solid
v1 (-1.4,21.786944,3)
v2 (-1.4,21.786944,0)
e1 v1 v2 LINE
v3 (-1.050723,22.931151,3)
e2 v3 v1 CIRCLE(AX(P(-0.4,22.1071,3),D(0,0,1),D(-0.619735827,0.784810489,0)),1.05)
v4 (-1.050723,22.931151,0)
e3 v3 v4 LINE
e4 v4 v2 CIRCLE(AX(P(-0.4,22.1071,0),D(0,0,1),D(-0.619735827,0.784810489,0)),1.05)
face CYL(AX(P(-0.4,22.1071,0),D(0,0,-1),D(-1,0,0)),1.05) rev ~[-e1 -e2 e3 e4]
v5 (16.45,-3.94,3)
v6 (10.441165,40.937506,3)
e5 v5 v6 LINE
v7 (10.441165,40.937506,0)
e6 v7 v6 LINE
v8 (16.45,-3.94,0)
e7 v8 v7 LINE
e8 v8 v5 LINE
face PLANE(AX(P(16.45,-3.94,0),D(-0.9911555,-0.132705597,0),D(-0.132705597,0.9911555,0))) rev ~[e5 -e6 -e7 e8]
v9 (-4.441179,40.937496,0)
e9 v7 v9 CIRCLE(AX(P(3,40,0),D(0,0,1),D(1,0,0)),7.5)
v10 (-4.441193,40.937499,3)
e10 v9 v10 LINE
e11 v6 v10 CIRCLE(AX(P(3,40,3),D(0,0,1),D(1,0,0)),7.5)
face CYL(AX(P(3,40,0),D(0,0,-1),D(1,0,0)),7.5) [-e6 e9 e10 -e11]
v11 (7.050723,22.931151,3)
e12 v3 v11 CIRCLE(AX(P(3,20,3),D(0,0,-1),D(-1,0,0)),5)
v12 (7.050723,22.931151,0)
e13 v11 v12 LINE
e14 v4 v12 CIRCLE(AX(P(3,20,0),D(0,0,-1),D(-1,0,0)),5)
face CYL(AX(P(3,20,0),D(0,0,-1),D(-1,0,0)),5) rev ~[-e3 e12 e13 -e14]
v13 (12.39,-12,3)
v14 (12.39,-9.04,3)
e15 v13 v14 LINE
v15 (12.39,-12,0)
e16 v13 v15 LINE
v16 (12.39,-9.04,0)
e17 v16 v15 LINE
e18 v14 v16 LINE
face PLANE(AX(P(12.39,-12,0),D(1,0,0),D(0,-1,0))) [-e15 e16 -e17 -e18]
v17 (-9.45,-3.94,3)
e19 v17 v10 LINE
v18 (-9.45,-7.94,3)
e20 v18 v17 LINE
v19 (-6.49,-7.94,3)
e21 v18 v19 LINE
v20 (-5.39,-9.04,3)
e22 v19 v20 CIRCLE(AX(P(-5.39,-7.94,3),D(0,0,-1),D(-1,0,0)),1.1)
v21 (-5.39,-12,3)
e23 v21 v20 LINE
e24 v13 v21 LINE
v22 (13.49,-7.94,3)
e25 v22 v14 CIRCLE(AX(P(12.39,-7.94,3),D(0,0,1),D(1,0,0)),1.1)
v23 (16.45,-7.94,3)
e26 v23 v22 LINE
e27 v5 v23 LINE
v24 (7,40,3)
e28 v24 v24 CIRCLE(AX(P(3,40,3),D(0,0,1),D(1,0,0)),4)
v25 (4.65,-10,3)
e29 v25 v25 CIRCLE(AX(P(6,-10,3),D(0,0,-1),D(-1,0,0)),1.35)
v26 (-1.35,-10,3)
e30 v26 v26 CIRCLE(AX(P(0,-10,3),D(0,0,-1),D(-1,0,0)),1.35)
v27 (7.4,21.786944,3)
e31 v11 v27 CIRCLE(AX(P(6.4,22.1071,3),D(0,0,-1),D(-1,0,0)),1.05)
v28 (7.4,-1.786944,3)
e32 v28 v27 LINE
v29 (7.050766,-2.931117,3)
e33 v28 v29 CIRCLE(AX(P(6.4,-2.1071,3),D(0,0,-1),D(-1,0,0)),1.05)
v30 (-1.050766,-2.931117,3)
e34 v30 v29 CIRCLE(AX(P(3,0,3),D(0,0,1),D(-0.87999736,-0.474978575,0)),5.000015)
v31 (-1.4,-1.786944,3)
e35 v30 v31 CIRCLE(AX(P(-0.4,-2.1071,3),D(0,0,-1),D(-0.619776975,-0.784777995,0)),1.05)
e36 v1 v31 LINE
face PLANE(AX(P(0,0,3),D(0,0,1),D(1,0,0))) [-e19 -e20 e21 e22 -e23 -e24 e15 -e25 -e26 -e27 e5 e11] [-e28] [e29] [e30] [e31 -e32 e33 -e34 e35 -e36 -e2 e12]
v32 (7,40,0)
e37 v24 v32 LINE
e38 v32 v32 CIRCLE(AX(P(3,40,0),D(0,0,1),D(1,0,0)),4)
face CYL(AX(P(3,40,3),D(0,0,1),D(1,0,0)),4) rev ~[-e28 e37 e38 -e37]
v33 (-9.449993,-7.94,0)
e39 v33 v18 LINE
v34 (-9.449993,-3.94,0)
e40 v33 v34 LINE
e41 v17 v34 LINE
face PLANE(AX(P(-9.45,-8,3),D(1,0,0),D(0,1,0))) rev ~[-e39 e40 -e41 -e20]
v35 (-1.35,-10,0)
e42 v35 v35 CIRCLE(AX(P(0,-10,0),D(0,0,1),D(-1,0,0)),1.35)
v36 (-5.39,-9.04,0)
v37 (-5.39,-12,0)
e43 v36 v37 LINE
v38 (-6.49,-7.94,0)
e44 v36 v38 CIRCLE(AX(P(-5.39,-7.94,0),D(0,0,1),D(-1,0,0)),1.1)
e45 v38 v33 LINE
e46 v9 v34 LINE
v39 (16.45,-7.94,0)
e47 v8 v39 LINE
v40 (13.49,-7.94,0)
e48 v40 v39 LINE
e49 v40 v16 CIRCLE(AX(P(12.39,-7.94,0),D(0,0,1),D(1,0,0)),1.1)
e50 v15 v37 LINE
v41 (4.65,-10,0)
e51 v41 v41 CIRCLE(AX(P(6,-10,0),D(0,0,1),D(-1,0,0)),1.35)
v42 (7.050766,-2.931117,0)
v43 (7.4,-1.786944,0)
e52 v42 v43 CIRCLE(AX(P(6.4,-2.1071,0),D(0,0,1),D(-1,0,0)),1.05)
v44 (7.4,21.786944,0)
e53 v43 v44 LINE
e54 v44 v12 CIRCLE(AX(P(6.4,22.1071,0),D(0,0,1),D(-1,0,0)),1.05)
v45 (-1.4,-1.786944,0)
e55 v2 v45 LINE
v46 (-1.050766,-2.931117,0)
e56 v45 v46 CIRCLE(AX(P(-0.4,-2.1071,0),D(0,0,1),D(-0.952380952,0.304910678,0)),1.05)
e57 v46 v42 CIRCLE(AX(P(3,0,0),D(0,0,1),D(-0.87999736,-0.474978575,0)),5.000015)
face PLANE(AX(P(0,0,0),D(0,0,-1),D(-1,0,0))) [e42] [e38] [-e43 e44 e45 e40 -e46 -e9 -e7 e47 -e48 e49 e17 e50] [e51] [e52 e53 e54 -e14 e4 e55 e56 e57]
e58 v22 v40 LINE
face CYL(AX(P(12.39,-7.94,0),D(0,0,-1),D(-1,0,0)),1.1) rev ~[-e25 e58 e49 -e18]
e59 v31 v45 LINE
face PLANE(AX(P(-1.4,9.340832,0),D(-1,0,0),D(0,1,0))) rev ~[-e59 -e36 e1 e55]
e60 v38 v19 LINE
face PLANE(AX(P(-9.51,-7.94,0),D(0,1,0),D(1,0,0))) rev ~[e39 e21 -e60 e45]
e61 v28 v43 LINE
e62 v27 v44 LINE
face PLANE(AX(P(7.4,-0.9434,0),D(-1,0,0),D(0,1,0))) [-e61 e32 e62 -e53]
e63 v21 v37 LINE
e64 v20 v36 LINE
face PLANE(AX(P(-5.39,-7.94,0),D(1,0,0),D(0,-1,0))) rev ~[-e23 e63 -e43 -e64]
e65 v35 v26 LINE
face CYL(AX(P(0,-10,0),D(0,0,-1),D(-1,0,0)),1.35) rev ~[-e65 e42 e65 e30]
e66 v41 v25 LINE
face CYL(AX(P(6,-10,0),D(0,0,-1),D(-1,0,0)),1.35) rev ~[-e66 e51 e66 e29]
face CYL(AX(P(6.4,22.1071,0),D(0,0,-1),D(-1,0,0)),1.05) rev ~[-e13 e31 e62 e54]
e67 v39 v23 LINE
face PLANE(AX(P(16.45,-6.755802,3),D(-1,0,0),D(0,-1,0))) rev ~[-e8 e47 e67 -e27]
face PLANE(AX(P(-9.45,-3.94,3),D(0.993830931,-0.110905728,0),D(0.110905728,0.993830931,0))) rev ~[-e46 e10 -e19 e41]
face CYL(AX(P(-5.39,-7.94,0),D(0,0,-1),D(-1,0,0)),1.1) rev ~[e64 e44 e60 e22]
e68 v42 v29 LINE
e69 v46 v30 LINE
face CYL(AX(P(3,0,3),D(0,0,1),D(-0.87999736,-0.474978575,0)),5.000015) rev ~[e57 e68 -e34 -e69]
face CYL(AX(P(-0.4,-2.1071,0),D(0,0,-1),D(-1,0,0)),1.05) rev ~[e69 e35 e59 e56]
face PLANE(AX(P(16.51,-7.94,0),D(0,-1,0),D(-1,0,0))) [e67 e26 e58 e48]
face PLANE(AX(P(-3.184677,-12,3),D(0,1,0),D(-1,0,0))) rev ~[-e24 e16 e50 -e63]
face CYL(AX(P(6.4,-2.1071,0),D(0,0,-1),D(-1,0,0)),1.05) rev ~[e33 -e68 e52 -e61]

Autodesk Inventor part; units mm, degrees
ref_plane "YZ Plane" through (0, 0, 0) normal (1, 0, 0) x (0, 1, 0)
ref_plane "XZ Plane" through (0, 0, 0) normal (0, 1, 0) x (-1, 0, 0)
ref_plane "XY Plane" through (0, 0, 0) normal (0, 0, 1) x (1, 0, 0)
sketch "스케치1" plane through (0, 0, 0) normal (0, 0, 1) x (1, 0, 0)
  circle A0 centre (3, 0) radius 3 projected
  line L0 (7.4, -0.9434) -> (7.4, 0.9434) projected
  arc A1 (7.4, 0.9434) -> (-1.4, 0.9434) centre (3, 0) ccw projected
  line L1 (-1.4, 0.9434) -> (-1.4, -0.9434) projected
  arc A2 (-1.4, -0.9434) -> (7.4, -0.9434) centre (3, 0) ccw projected
  circle A3 centre (3, 20) radius 2.75 projected
  line L2 (3, 20) -> (3, 0)
  line L3 (3, 20) -> (3, 40)
  circle A4 centre (3, 40) radius 2.75
  circle A5 centre (3, 40) radius 7.5
  circle A6 centre (3, 0) radius 12.5
  line L4 (16.7123, -8.8378) -> (8.966, 52.6461)
  line L5 (-2.8681, 53.4235) -> (-11.5752, -15.6873)
  point P0 (0, 0)
  point P1 (10.4412, 40.9375)
  point P2 (-4.4412, 40.9375)
  point P3 (-9.402, 1.5625)
  point P4 (15.402, 1.5625)
  dimension "d2" = 360
  dimension "d4" = 5.5
  dimension "d5" = 15
  dimension "d6" = 25
extrude "돌출1" add sketch "스케치1" along normal blind 3 contours A3 L3 A5 L4 A6 L2 | A3 L2 A6 L5 A5 L3 | A5 | A6
sketch "스케치2" plane through (0, 0, 3) normal (0, 0, 1) x (1, 0, 0)
  line L0 (-4.4412, 40.9375) -> (-9.402, 1.5625) projected
  arc A0 (-9.402, 1.5625) -> (15.402, 1.5625) centre (3, 0) ccw projected
  line L1 (15.402, 1.5625) -> (10.4412, 40.9375) projected
  arc A1 (10.4412, 40.9375) -> (-4.4412, 40.9375) centre (3, 40) ccw projected
  circle A2 centre (3, 40) radius 2.75 projected
  circle A3 centre (3, 20) radius 2.75 projected
  arc A4 (7.4, 0.9434) -> (-1.4, 0.9434) centre (3, 0) ccw projected
  line L2 (7.4, 0.9434) -> (7.4, -0.9434) projected
  arc A5 (-1.4, -0.9434) -> (7.4, -0.9434) centre (3, 0) ccw projected
  line L3 (-1.4, -0.9434) -> (-1.4, 0.9434) projected
  line L4 (-1.4, 14.3273) -> (-1.4, 9.5775) projected
  arc A6 (7.4, 14.3273) -> (-1.4, 14.3273) centre (3, 11.9524) ccw projected
  line L5 (7.4, 9.5775) -> (7.4, 14.3273) projected
  arc A7 (-1.4, 9.5775) -> (7.4, 9.5775) centre (3, 11.9524) ccw projected
  circle A8 centre (3, 11.9524) radius 6 projected
  line L6 (-1.4, 14.3273) -> (-1.4, -0.9434)
  line L7 (7.4, 14.3273) -> (7.4, -0.9434)
  point P0 (0, 0)
  point P1 (-1.4, 0.9434)
  point P2 (7.4, 0.9434)
extrude "돌출2" cut sketch "스케치2" against normal up to surface (3 mm away) contours L6 A7 L7 A8 | A8 L7 A4 L6 | L4 A6 L5 A7
sketch "스케치3" plane through (0, 0, 0) normal (0, 0, -1) x (-1, 0, 0)
  circle A0 centre (-3, 40) radius 3.7 projected
  point P0 (0, 0)
extrude "돌출3" cut sketch "스케치3" against normal through all
sketch "스케치4" plane through (0, 0, 3) normal (0, 0, 1) x (1, 0, 0)
  circle A0 centre (3, 40) radius 4 projected
  circle A1 centre (3, 40) radius 3.7 projected
  line L0 (-1.4, -0.9434) -> (-1.4, 14.3273) projected
  arc A2 (7.4, 14.3273) -> (-1.4, 14.3273) centre (3, 11.9524) ccw projected
  line L1 (7.4, 14.3273) -> (7.4, -0.9434) projected
  arc A3 (-1.4, -0.9434) -> (7.4, -0.9434) centre (3, 0) ccw projected
  circle A4 centre (3, 20) radius 2.75 projected
  line L2 (-4.4412, 40.9375) -> (-9.402, 1.5625) projected
  arc A5 (-9.402, 1.5625) -> (15.402, 1.5625) centre (3, 0) ccw projected
  line L3 (15.402, 1.5625) -> (10.4412, 40.9375) projected
  arc A6 (10.4412, 40.9375) -> (-4.4412, 40.9375) centre (3, 40) ccw projected
  point P0 (0, 0)
extrude "돌출4" cut sketch "스케치4" against normal through all contours A0 | A1
sketch "스케치5" plane through (0, 0, 3) normal (0, 0, 1) x (1, 0, 0)
  circle A0 centre (3, 40) radius 4 projected
  line L0 (-1.4, -0.9434) -> (-1.4, 14.3273) projected
  arc A1 (7.4, 14.3273) -> (-1.4, 14.3273) centre (3, 11.9524) ccw projected
  line L1 (7.4, 14.3273) -> (7.4, -0.9434) projected
  arc A2 (-1.4, -0.9434) -> (7.4, -0.9434) centre (3, 0) ccw projected
  circle A3 centre (3, 20) radius 2.75 projected
  line L2 (-4.4412, 40.9375) -> (-9.402, 1.5625) projected
  arc A4 (-9.402, 1.5625) -> (15.402, 1.5625) centre (3, 0) ccw projected
  line L3 (15.402, 1.5625) -> (10.4412, 40.9375) projected
  arc A5 (10.4412, 40.9375) -> (-4.4412, 40.9375) centre (3, 40) ccw projected
  point P0 (0, 0)
extrude "돌출5" add sketch "스케치5" against normal up to surface (3 mm away) contours A3
sketch "스케치6" plane through (0, 0, 3) normal (0, 0, 1) x (1, 0, 0)
  circle A0 centre (3, 40) radius 4 projected
  line L0 (-1.4, -0.9434) -> (-1.4, 14.3273) projected
  arc A1 (7.4, 14.3273) -> (-1.4, 14.3273) centre (3, 11.9524) ccw projected
  line L1 (7.4, 14.3273) -> (7.4, -0.9434) projected
  arc A2 (-1.4, -0.9434) -> (7.4, -0.9434) centre (3, 0) ccw projected
  line L2 (-4.4412, 40.9375) -> (-9.402, 1.5625) projected
  arc A3 (-9.402, 1.5625) -> (15.402, 1.5625) centre (3, 0) ccw projected
  line L3 (15.402, 1.5625) -> (10.4412, 40.9375) projected
  arc A4 (10.4412, 40.9375) -> (-4.4412, 40.9375) centre (3, 40) ccw projected
  line L4 (-6.4255, 1.1875) -> (-1.4647, 40.5625)
  arc A5 (7.4647, 40.5625) -> (-1.4647, 40.5625) centre (3, 40) ccw
  line L5 (7.4647, 40.5625) -> (12.4255, 1.1875)
  arc A6 (-6.4255, 1.1875) -> (12.4255, 1.1875) centre (3, 0) ccw
  circle A7 centre (3, 40) radius 7
  circle A8 centre (3, 11.9524) radius 8.0059
  point P0 (0, 0)
  point P1 (-4.9432, 12.9531)
  point P2 (10.9432, 12.9531)
  point P3 (8.1349, 35.2427)
  point P4 (-2.1349, 35.2427)
  dimension "d17" = 3
  dimension "d18" = 3
extrude "돌출6" cut sketch "스케치6" against normal through all contours L4 A7 L5 A8
fillet "모깎기1" radius 2 4 edges at (-2.1349, 35.2427, 1.5) (8.1349, 35.2427, 1.5) (-4.9432, 12.9531, 1.5) (10.9432, 12.9531, 1.5)
sketch "스케치8" plane through (0, 0, 3) normal (0, 0, 1) x (1, 0, 0)
  arc A0 (0.2302, 33.5713) -> (5.7698, 33.5713) centre (3, 40) ccw projected
  arc A1 (0.2302, 33.5713) -> (-2.5454, 31.9845) centre (-0.5611, 31.7345) ccw projected
  line L0 (-2.5454, 31.9845) -> (-3.9428, 20.8933) projected
  arc A2 (-3.9428, 20.8933) -> (-0.9674, 18.9062) centre (-1.9585, 20.6433) ccw projected
  arc A3 (6.9674, 18.9062) -> (-0.9674, 18.9062) centre (3, 11.9524) ccw projected
  arc A4 (6.9674, 18.9062) -> (9.9428, 20.8933) centre (7.9585, 20.6433) ccw projected
  line L1 (9.9428, 20.8933) -> (8.5454, 31.9845) projected
  arc A5 (8.5454, 31.9845) -> (5.7698, 33.5713) centre (6.5611, 31.7345) ccw projected
  circle A6 centre (3, 40) radius 4 projected
  line L2 (-1.4, 14.3273) -> (-1.4, -0.9434) projected
  arc A7 (-1.4, -0.9434) -> (7.4, -0.9434) centre (3, 0) ccw projected
  line L3 (7.4, -0.9434) -> (7.4, 14.3273) projected
  arc A8 (7.4, 14.3273) -> (-1.4, 14.3273) centre (3, 11.9524) ccw projected
  line L4 (-4.4412, 40.9375) -> (-9.402, 1.5625) projected
  arc A9 (10.4412, 40.9375) -> (-4.4412, 40.9375) centre (3, 40) ccw projected
  line L5 (15.402, 1.5625) -> (10.4412, 40.9375) projected
  arc A10 (-9.402, 1.5625) -> (15.402, 1.5625) centre (3, 0) ccw projected
  arc A11 (-1.4, 9.3409) -> (7.4, 9.3409) centre (3, 11.7157) ccw projected
  arc A12 (7.4, 14.0906) -> (-1.4, 14.0906) centre (3, 11.7157) ccw projected
  point P0 (0, 0)
extrude "돌출8" add sketch "스케치8" against normal up to surface (3 mm away) contours A8 L3 A12 L2
sketch "스케치9" plane through (0, 0, 0) normal (0, 0, -1) x (-1, 0, 0)
  line L0 (10.45, -12) -> (-15.45, -12)
  line L1 (10.45, -12) -> (10.45, -8)
  line L2 (-15.45, -8) -> (10.45, -8)
  line L3 (-15.45, -12) -> (-15.45, -8)
  arc A0 (-5.7698, 33.5713) -> (-0.2302, 33.5713) centre (-3, 40) ccw projected
  arc A1 (2.5454, 31.9845) -> (-0.2302, 33.5713) centre (0.5611, 31.7345) ccw projected
  line L4 (2.5454, 31.9845) -> (3.9428, 20.8933) projected
  arc A2 (0.9674, 18.9062) -> (3.9428, 20.8933) centre (1.9585, 20.6433) ccw projected
  arc A3 (0.9674, 18.9062) -> (-6.9674, 18.9062) centre (-3, 11.9524) ccw projected
  arc A4 (-9.9428, 20.8933) -> (-6.9674, 18.9062) centre (-7.9585, 20.6433) ccw projected
  line L5 (-9.9428, 20.8933) -> (-8.5454, 31.9845) projected
  arc A5 (-5.7698, 33.5713) -> (-8.5454, 31.9845) centre (-6.5611, 31.7345) ccw projected
  circle A6 centre (-3, 40) radius 4 projected
  line L6 (1.4, 14.0906) -> (1.4, -0.9434) projected
  arc A7 (-7.4, -0.9434) -> (1.4, -0.9434) centre (-3, 0) ccw projected
  line L7 (-7.4, -0.9434) -> (-7.4, 14.0906) projected
  arc A8 (1.4, 14.0906) -> (-7.4, 14.0906) centre (-3, 11.7157) ccw projected
  line L8 (4.4412, 40.9375) -> (9.402, 1.5625) projected
  arc A9 (4.4412, 40.9375) -> (-10.4412, 40.9375) centre (-3, 40) ccw projected
  line L9 (-15.402, 1.5625) -> (-10.4412, 40.9375) projected
  arc A10 (-15.402, 1.5625) -> (9.402, 1.5625) centre (-3, 0) ccw projected
  circle A11 centre (-3, 0) radius 12.5
  line L10 (-3, 0) -> (-15.5, 0)
  line L11 (-15.5, 0) -> (9.5, 0)
  line L12 (9.5, 0) -> (-15.5, 0)
  line L13 (-15.5, 0) -> (-15.5, -12)
  line L14 (-15.5, -12) -> (9.5, -12)
  line L15 (9.5, -12) -> (9.5, 0)
  point P0 (0, 0)
  point P1 (-6.5, -12)
  point P2 (0.5, -12)
extrude "돌출9" add sketch "스케치9" against normal up to surface (3 mm away) contours L0 A10 L2 L15 | L2 A10 L15 | L0 L3 L2 A10 | L14 L13 A10 L2 L3
sketch "스케치10" plane through (0, 0, 0) normal (0, 0, -1) x (-1, 0, 0)
  arc A0 (-5.7698, 33.5713) -> (-0.2302, 33.5713) centre (-3, 40) ccw projected
  arc A1 (2.5454, 31.9845) -> (-0.2302, 33.5713) centre (0.5611, 31.7345) ccw projected
  line L0 (2.5454, 31.9845) -> (3.9428, 20.8933) projected
  arc A2 (0.9674, 18.9062) -> (3.9428, 20.8933) centre (1.9585, 20.6433) ccw projected
  arc A3 (0.9674, 18.9062) -> (-6.9674, 18.9062) centre (-3, 11.9524) ccw projected
  arc A4 (-9.9428, 20.8933) -> (-6.9674, 18.9062) centre (-7.9585, 20.6433) ccw projected
  line L1 (-9.9428, 20.8933) -> (-8.5454, 31.9845) projected
  arc A5 (-5.7698, 33.5713) -> (-8.5454, 31.9845) centre (-6.5611, 31.7345) ccw projected
  circle A6 centre (-3, 40) radius 4 projected
  line L2 (1.4, 14.0906) -> (1.4, -0.9434) projected
  arc A7 (-7.4, -0.9434) -> (1.4, -0.9434) centre (-3, 0) ccw projected
  line L3 (-7.4, -0.9434) -> (-7.4, 14.0906) projected
  arc A8 (1.4, 14.0906) -> (-7.4, 14.0906) centre (-3, 11.7157) ccw projected
  line L4 (4.4412, 40.9375) -> (9.402, 1.5625) projected
  arc A9 (4.4412, 40.9375) -> (-10.4412, 40.9375) centre (-3, 40) ccw projected
  line L5 (-15.402, 1.5625) -> (-10.4412, 40.9375) projected
  arc A10 (-15.402, 1.5625) -> (-15.5, 0) centre (-3, 0) ccw projected
  line L6 (-15.5, 0) -> (-15.5, -12) projected
  line L7 (-15.5, -12) -> (-6.5, -12) projected
  arc A11 (-6.5, -12) -> (0.5, -12) centre (-3, 0) ccw projected
  line L8 (0.5, -12) -> (9.5, -12) projected
  line L9 (9.5, -12) -> (9.5, 0) projected
  arc A12 (9.5, 0) -> (9.402, 1.5625) centre (-3, 0) ccw projected
  line L10 (9.5, -12) -> (-15.5, -12)
  point P0 (0, 0)
extrude "돌출10" cut sketch "스케치10" against normal through all contours A11 L10
sketch "스케치11" plane through (0, 0, 0) normal (0, 0, -1) x (-1, 0, 0)
  line L0 (-8.5, -12) -> (3.5, -12)
  line L1 (-8.5, -8) -> (-8.5, -12)
  line L2 (3.5, -8) -> (-8.5, -8)
  line L3 (3.5, -12) -> (3.5, -8)
  line L4 (3.5, -10) -> (0.5, -10)
  line L5 (3.5, -10) -> (6.5, -10) construction
  line L6 (-8.5, -10) -> (-5.5, -10)
  line L7 (-8.5, -10) -> (-5.5, -10) construction
  circle A0 centre (0.5, -10) radius 1.35
  circle A1 centre (-5.5, -10) radius 1.35
  line L8 (-15.5, -12) -> (9.5, -12) projected
  line L9 (9.5, -12) -> (9.5, 0) projected
  arc A2 (9.5, 0) -> (9.402, 1.5625) centre (-3, 0) ccw projected
  line L10 (4.4412, 40.9375) -> (9.402, 1.5625) projected
  arc A3 (4.4412, 40.9375) -> (-10.4412, 40.9375) centre (-3, 40) ccw projected
  line L11 (-15.402, 1.5625) -> (-10.4412, 40.9375) projected
  arc A4 (-15.402, 1.5625) -> (-15.5, 0) centre (-3, 0) ccw projected
  line L12 (-15.5, 0) -> (-15.5, -12) projected
  line L13 (1.4, 14.0906) -> (1.4, -0.9434) projected
  arc A5 (-7.4, -0.9434) -> (1.4, -0.9434) centre (-3, 0) ccw projected
  line L14 (-7.4, -0.9434) -> (-7.4, 14.0906) projected
  arc A6 (1.4, 14.0906) -> (-7.4, 14.0906) centre (-3, 11.7157) ccw projected
  circle A7 centre (-3, 40) radius 4 projected
  arc A8 (-5.7698, 33.5713) -> (-0.2302, 33.5713) centre (-3, 40) ccw projected
  arc A9 (2.5454, 31.9845) -> (-0.2302, 33.5713) centre (0.5611, 31.7345) ccw projected
  line L15 (2.5454, 31.9845) -> (3.9428, 20.8933) projected
  arc A10 (0.9674, 18.9062) -> (3.9428, 20.8933) centre (1.9585, 20.6433) ccw projected
  arc A11 (0.9674, 18.9062) -> (-6.9674, 18.9062) centre (-3, 11.9524) ccw projected
  arc A12 (-9.9428, 20.8933) -> (-6.9674, 18.9062) centre (-7.9585, 20.6433) ccw projected
  line L16 (-9.9428, 20.8933) -> (-8.5454, 31.9845) projected
  arc A13 (-5.7698, 33.5713) -> (-8.5454, 31.9845) centre (-6.5611, 31.7345) ccw projected
  circle A14 centre (-3, 0) radius 13.6473
  line L17 (-3, 0) -> (-3, -10)
  line L18 (-5.5, -10) -> (0.5, -10)
  line L19 (9.896, -15.3181) -> (21.896, -15.3181)
  line L20 (9.896, -11.3181) -> (9.896, -15.3181)
  line L21 (21.896, -11.3181) -> (9.896, -11.3181)
  line L22 (21.896, -15.3181) -> (21.896, -11.3181)
  line L23 (21.896, -13.3181) -> (18.896, -13.3181)
  line L24 (9.896, -13.3181) -> (12.896, -13.3181)
  line L25 (9.896, -13.3181) -> (12.896, -13.3181) construction
  circle A15 centre (18.896, -13.3181) radius 1.35
  circle A16 centre (12.896, -13.3181) radius 1.35
  line L26 (12.896, -13.3181) -> (18.896, -13.3181)
  circle A17 centre (15.896, -13.3181) radius 0.4879
  line L27 (-9, -10) -> (-6, -10) construction
  line L28 (-9, -10) -> (-6, -10)
  line L29 (-9, -8) -> (-9, -12)
  circle A18 centre (-6, -10) radius 1.35
  line L30 (-6, -10) -> (0, -10)
  circle A19 centre (0, -10) radius 1.35
  line L31 (3, -10) -> (0, -10)
  line L32 (-9, -12) -> (3, -12)
  line L33 (3, -12) -> (3, -8)
  line L34 (3, -8) -> (-9, -8)
  circle A20 centre (-3, -10) radius 0.4879
  point P0 (0, 0)
  point P1 (-9.5, -12)
  point P2 (-15.5, -5.4772)
  point P3 (9.5, -5.4772)
  point P4 (15.396, -13.3181)
  point P5 (-3.5, -10)
  dimension "d30" = 3
  dimension "d31" = 180
  dimension "d32" = 3
  dimension "d33" = 0
  dimension "d34" = 2.7
  dimension "d35" = 2.7
  dimension "d44" = 3
  dimension "d45" = 3
  dimension "d46" = 0
  dimension "d47" = 2.7
  dimension "d48" = 2.7
  dimension "d49" = 3
  dimension "d50" = 3
  dimension "d51" = 0
  dimension "d52" = 2.7
  dimension "d53" = 2.7
extrude "돌출11" cut sketch "스케치11" against normal through all contours A18 A1 L6 | L6 A1 A18 | A1 A18 L18 L6 | L6 L18 A18 A1 | A19 A0 L18 L4 | L4 L18 A0 A19 | A0 L18 A19 | A19 L18 A0
sketch "스케치12" plane through (0, 0, 0) normal (0, 0, -1) x (-1, 0, 0)
  line L0 (-15.5, -12) -> (9.5, -12) projected
  line L1 (9.5, -12) -> (9.5, 0) projected
  arc A0 (9.5, 0) -> (9.402, 1.5625) centre (-3, 0) ccw projected
  line L2 (4.4412, 40.9375) -> (9.402, 1.5625) projected
  arc A1 (4.4412, 40.9375) -> (-10.4412, 40.9375) centre (-3, 40) ccw projected
  line L3 (-15.402, 1.5625) -> (-10.4412, 40.9375) projected
  arc A2 (-15.402, 1.5625) -> (-15.5, 0) centre (-3, 0) ccw projected
  line L4 (-15.5, 0) -> (-15.5, -12) projected
  line L5 (1.4, 14.0906) -> (1.4, -0.9434) projected
  arc A3 (-7.4, -0.9434) -> (1.4, -0.9434) centre (-3, 0) ccw projected
  line L6 (-7.4, -0.9434) -> (-7.4, 14.0906) projected
  arc A4 (1.4, 14.0906) -> (-7.4, 14.0906) centre (-3, 11.7157) ccw projected
  circle A5 centre (-3, 40) radius 4 projected
  arc A6 (-5.7698, 33.5713) -> (-0.2302, 33.5713) centre (-3, 40) ccw projected
  arc A7 (2.5454, 31.9845) -> (-0.2302, 33.5713) centre (0.5611, 31.7345) ccw projected
  line L7 (2.5454, 31.9845) -> (3.9428, 20.8933) projected
  arc A8 (0.9674, 18.9062) -> (3.9428, 20.8933) centre (1.9585, 20.6433) ccw projected
  arc A9 (0.9674, 18.9062) -> (-6.9674, 18.9062) centre (-3, 11.9524) ccw projected
  arc A10 (-9.9428, 20.8933) -> (-6.9674, 18.9062) centre (-7.9585, 20.6433) ccw projected
  line L8 (-9.9428, 20.8933) -> (-8.5454, 31.9845) projected
  arc A11 (-5.7698, 33.5713) -> (-8.5454, 31.9845) centre (-6.5611, 31.7345) ccw projected
  line L9 (9.5, -12) -> (-15.5, -12)
  line L10 (-15.5, -12) -> (-15.5, -13.5)
  line L11 (-15.5, -13.5) -> (9.5, -13.5)
  line L12 (9.5, -13.5) -> (9.5, -12)
  point P0 (0, 0)
  dimension "d38" = 1.5
extrude "돌출12" add sketch "스케치12" against normal up to surface (3 mm away) contours L0 L12 L11 L10
sketch "스케치13" plane through (0, 0, 0) normal (0, 0, -1) x (-1, 0, 0)
  line L0 (9.5, -13.5) -> (9.5, 0) projected
  arc A0 (9.5, 0) -> (9.402, 1.5625) centre (-3, 0) ccw projected
  line L1 (4.4412, 40.9375) -> (9.402, 1.5625) projected
  arc A1 (4.4412, 40.9375) -> (-10.4412, 40.9375) centre (-3, 40) ccw projected
  line L2 (-15.402, 1.5625) -> (-10.4412, 40.9375) projected
  arc A2 (-15.402, 1.5625) -> (-15.5, 0) centre (-3, 0) ccw projected
  line L3 (-15.5, 0) -> (-15.5, -13.5) projected
  line L4 (-15.5, -13.5) -> (9.5, -13.5) projected
  line L5 (1.4, 14.0906) -> (1.4, -0.9434) projected
  arc A3 (-7.4, -0.9434) -> (1.4, -0.9434) centre (-3, 0) ccw projected
  line L6 (-7.4, -0.9434) -> (-7.4, 14.0906) projected
  arc A4 (1.4, 14.0906) -> (-7.4, 14.0906) centre (-3, 11.7157) ccw projected
  circle A5 centre (-3, 40) radius 4 projected
  arc A6 (-5.7698, 33.5713) -> (-0.2302, 33.5713) centre (-3, 40) ccw projected
  arc A7 (2.5454, 31.9845) -> (-0.2302, 33.5713) centre (0.5611, 31.7345) ccw projected
  line L7 (2.5454, 31.9845) -> (3.9428, 20.8933) projected
  arc A8 (0.9674, 18.9062) -> (3.9428, 20.8933) centre (1.9585, 20.6433) ccw projected
  arc A9 (0.9674, 18.9062) -> (-6.9674, 18.9062) centre (-3, 11.9524) ccw projected
  arc A10 (-9.9428, 20.8933) -> (-6.9674, 18.9062) centre (-7.9585, 20.6433) ccw projected
  line L8 (-9.9428, 20.8933) -> (-8.5454, 31.9845) projected
  arc A11 (-5.7698, 33.5713) -> (-8.5454, 31.9845) centre (-6.5611, 31.7345) ccw projected
  circle A12 centre (-3, 0) radius 13.5
  point P0 (0, 0)
  point P1 (-3, -13.5)
  point P2 (-15.5, -5.099)
  point P3 (9.5, -5.099)
extrude "돌출13" cut sketch "스케치13" against normal through all contours L4 A12 L0 | L4 L3 A12
fillet "모깎기2" radius 10 2 edges at (-9.5, -5.099, 1.5) (15.5, -5.099, 1.5)
sketch "스케치14" plane through (0, 0, 3) normal (0, 0, 1) x (1, 0, 0)
  line L0 (7.4, -2.3749) -> (7.4, 2.3749)
  arc A0 (7.4, 2.3749) -> (-1.4, 2.3749) centre (3, 0) ccw
  arc A1 (12.6429, -9.448) -> (15.5, -2.4495) centre (5.5, -2.4495) ccw projected
  line L1 (15.5, 0) -> (15.5, -2.4495) projected
  arc A2 (15.5, 0) -> (15.402, 1.5625) centre (3, 0) ccw projected
  line L2 (15.402, 1.5625) -> (10.4412, 40.9375) projected
  arc A3 (10.4412, 40.9375) -> (-4.4412, 40.9375) centre (3, 40) ccw projected
  line L3 (-4.4412, 40.9375) -> (-9.402, 1.5625) projected
  arc A4 (-9.402, 1.5625) -> (-9.5, 0) centre (3, 0) ccw projected
  line L4 (-9.5, -2.4495) -> (-9.5, 0) projected
  arc A5 (-9.5, -2.4495) -> (-6.6429, -9.448) centre (0.5, -2.4495) ccw projected
  arc A6 (-6.6429, -9.448) -> (12.6429, -9.448) centre (3, 0) ccw projected
  circle A7 centre (6, -10) radius 1.35 projected
  circle A8 centre (0, -10) radius 1.35 projected
  arc A9 (0.2302, 33.5713) -> (5.7698, 33.5713) centre (3, 40) ccw projected
  arc A10 (8.5454, 31.9845) -> (5.7698, 33.5713) centre (6.5611, 31.7345) ccw projected
  line L5 (8.5454, 31.9845) -> (9.9428, 20.8933) projected
  arc A11 (6.9674, 18.9062) -> (9.9428, 20.8933) centre (7.9585, 20.6433) ccw projected
  arc A12 (6.9674, 18.9062) -> (-0.9674, 18.9062) centre (3, 11.9524) ccw projected
  arc A13 (-3.9428, 20.8933) -> (-0.9674, 18.9062) centre (-1.9585, 20.6433) ccw projected
  line L6 (-3.9428, 20.8933) -> (-2.5454, 31.9845) projected
  arc A14 (0.2302, 33.5713) -> (-2.5454, 31.9845) centre (-0.5611, 31.7345) ccw projected
  circle A15 centre (3, 40) radius 4 projected
  line L7 (-1.4, -0.9434) -> (-1.4, 14.0906) projected
  arc A16 (7.4, 14.0906) -> (-1.4, 14.0906) centre (3, 11.7157) ccw projected
  line L8 (7.4, 14.0906) -> (7.4, -0.9434) projected
  arc A17 (-1.4, -0.9434) -> (7.4, -0.9434) centre (3, 0) ccw projected
  arc A18 (-1.4, -2.3749) -> (7.4, -2.3749) centre (3, 0) ccw
  line L9 (-1.4, 2.3749) -> (-1.4, -2.3749)
  point P0 (0, 0)
extrude "돌출14" cut sketch "스케치14" against normal through all contours A18 L9 A17 L0
sketch "스케치15" plane through (0, 0, 3) normal (0, 0, 1) x (1, 0, 0)
  circle A0 centre (3, 11.7157) radius 6
  line L0 (7.4, 12.6591) -> (7.4, 10.7723)
  arc A1 (7.4, 12.6591) -> (-1.4, 12.6591) centre (3, 11.7157) ccw
  arc A2 (-1.4, 10.7723) -> (7.4, 10.7723) centre (3, 11.7157) ccw
  line L1 (-1.4, -2.3749) -> (-1.4, 14.0906) projected
  arc A3 (7.4, 14.0906) -> (-1.4, 14.0906) centre (3, 11.7157) ccw projected
  line L2 (7.4, 14.0906) -> (7.4, -2.3749) projected
  arc A4 (-1.4, -2.3749) -> (7.4, -2.3749) centre (3, 0) ccw projected
  arc A5 (12.6429, -9.448) -> (15.5, -2.4495) centre (5.5, -2.4495) ccw projected
  line L3 (15.5, 0) -> (15.5, -2.4495) projected
  arc A6 (15.5, 0) -> (15.402, 1.5625) centre (3, 0) ccw projected
  line L4 (15.402, 1.5625) -> (10.4412, 40.9375) projected
  arc A7 (10.4412, 40.9375) -> (-4.4412, 40.9375) centre (3, 40) ccw projected
  line L5 (-4.4412, 40.9375) -> (-9.402, 1.5625) projected
  arc A8 (-9.402, 1.5625) -> (-9.5, 0) centre (3, 0) ccw projected
  line L6 (-9.5, -2.4495) -> (-9.5, 0) projected
  arc A9 (-9.5, -2.4495) -> (-6.6429, -9.448) centre (0.5, -2.4495) ccw projected
  arc A10 (-6.6429, -9.448) -> (12.6429, -9.448) centre (3, 0) ccw projected
  circle A11 centre (6, -10) radius 1.35 projected
  circle A12 centre (0, -10) radius 1.35 projected
  arc A13 (0.2302, 33.5713) -> (5.7698, 33.5713) centre (3, 40) ccw projected
  arc A14 (8.5454, 31.9845) -> (5.7698, 33.5713) centre (6.5611, 31.7345) ccw projected
  line L7 (8.5454, 31.9845) -> (9.9428, 20.8933) projected
  arc A15 (6.9674, 18.9062) -> (9.9428, 20.8933) centre (7.9585, 20.6433) ccw projected
  arc A16 (6.9674, 18.9062) -> (-0.9674, 18.9062) centre (3, 11.9524) ccw projected
  arc A17 (-3.9428, 20.8933) -> (-0.9674, 18.9062) centre (-1.9585, 20.6433) ccw projected
  line L8 (-3.9428, 20.8933) -> (-2.5454, 31.9845) projected
  arc A18 (0.2302, 33.5713) -> (-2.5454, 31.9845) centre (-0.5611, 31.7345) ccw projected
  circle A19 centre (3, 40) radius 4 projected
  point P0 (0, 0)
  point P1 (-1.4, 12.6591)
  point P2 (7.4, 12.6591)
extrude "돌출15" add sketch "스케치15" against normal up to surface (3 mm away) contours L1 A3 L2 A1
sketch "스케치16" plane through (0, 0, 0) normal (0, 0, -1) x (-1, 0, 0)
  arc A0 (-7.398, 14.0944) -> (-2.5749, 6.7338) centre (-3, 11.7157) ccw
  circle A1 centre (-3, 11.7157) radius 5
  arc A2 (-7.4, -2.3749) -> (1.4, -2.3749) centre (-3, 0) ccw projected
  line L0 (-7.4, -2.3749) -> (1.4, -2.3749)
  line L1 (1.4, -2.3749) -> (1.4, 16.7157)
  line L2 (1.4, 16.7157) -> (-7.4, 16.7157)
  line L3 (-7.4, 16.7157) -> (-7.4, -2.3749)
  point P0 (0, 0)
  point P1 (1.4, 14.0906)
  point P2 (-7.398, 14.0944)
  point P3 (-7.4, 14.0906)
extrude "돌출16" cut sketch "스케치16" against normal through all contours A1 L1 A0 L3 | A0 A1 L1 L0 L3 | L0 A2
sketch "스케치17" plane through (0, 0, 0) normal (0, 0, -1) x (-1, 0, 0)
  arc A0 (-15.5, -2.4495) -> (-12.6429, -9.448) centre (-5.5, -2.4495) ccw projected
  arc A1 (-12.6429, -9.448) -> (6.6429, -9.448) centre (-3, 0) ccw projected
  arc A2 (6.6429, -9.448) -> (9.5, -2.4495) centre (-0.5, -2.4495) ccw projected
  line L0 (9.5, -2.4495) -> (9.5, 0) projected
  arc A3 (9.5, 0) -> (9.402, 1.5625) centre (-3, 0) ccw projected
  line L1 (4.4412, 40.9375) -> (9.402, 1.5625) projected
  arc A4 (4.4412, 40.9375) -> (-10.4412, 40.9375) centre (-3, 40) ccw projected
  line L2 (-15.402, 1.5625) -> (-10.4412, 40.9375) projected
  arc A5 (-15.402, 1.5625) -> (-15.5, 0) centre (-3, 0) ccw projected
  line L3 (-15.5, 0) -> (-15.5, -2.4495) projected
  arc A6 (-5.7698, 33.5713) -> (-0.2302, 33.5713) centre (-3, 40) ccw projected
  arc A7 (2.5454, 31.9845) -> (-0.2302, 33.5713) centre (0.5611, 31.7345) ccw projected
  line L4 (2.5454, 31.9845) -> (3.9428, 20.8933) projected
  arc A8 (0.9674, 18.9062) -> (3.9428, 20.8933) centre (1.9585, 20.6433) ccw projected
  arc A9 (0.9674, 18.9062) -> (-6.9674, 18.9062) centre (-3, 11.9524) ccw projected
  arc A10 (-9.9428, 20.8933) -> (-6.9674, 18.9062) centre (-7.9585, 20.6433) ccw projected
  line L5 (-9.9428, 20.8933) -> (-8.5454, 31.9845) projected
  arc A11 (-5.7698, 33.5713) -> (-8.5454, 31.9845) centre (-6.5611, 31.7345) ccw projected
  circle A12 centre (-3, 40) radius 4 projected
  line L6 (-7.4, -2.3749) -> (-7.4, 14.0906) projected
  arc A13 (1.4, 14.0906) -> (-7.4, 14.0906) centre (-3, 11.7157) ccw projected
  line L7 (1.4, 14.0906) -> (1.4, -2.3749) projected
  arc A14 (-7.4, -2.3749) -> (1.4, -2.3749) centre (-3, 0) ccw projected
  circle A15 centre (0, -10) radius 1.35 projected
  circle A16 centre (-6, -10) radius 1.35 projected
  line L8 (-6.4, 13.8229) -> (-6.4, -2.1071)
  arc A17 (-6.4, -2.1071) -> (0.4, -2.1071) centre (-3, 0) ccw
  line L9 (0.4, -2.1071) -> (0.4, 13.8229)
  arc A18 (0.4, 13.8229) -> (-6.4, 13.8229) centre (-3, 11.7157) ccw
  circle A19 centre (-6.4, 13.8229) radius 1.05
  circle A20 centre (0.4, 13.8229) radius 1.05
  circle A21 centre (-6.4, -2.1071) radius 1.05
  circle A22 centre (0.4, -2.1071) radius 1.05
  point P0 (0, 0)
  dimension "d60" = 1
  dimension "d61" = 2.1
  dimension "d62" = 2.1
  dimension "d63" = 2.1
  dimension "d64" = 2.1
extrude "돌출17" cut sketch "스케치17" against normal through all contours A14 A21 L6 | L6 A21 L8 A17 A14 | A19 A13 L6 | L6 A13 A19 A18 L8 | A21 A17 L8 | A22 A17 L9 L7 A14 | A14 L7 A22 | L8 A18 A19 | A22 L9 A17 | A20 L7 A13 | A13 L7 A20 L9 A18 | A18 L9 A20
sketch "스케치18" plane through (0, 0, 0) normal (0, 0, -1) x (-1, 0, 0)
  circle A0 centre (-6, -10) radius 1.35 projected
  circle A1 centre (0, -10) radius 1.35 projected
  circle A2 centre (-3, 40) radius 4 projected
  arc A3 (-5.7698, 33.5713) -> (-0.2302, 33.5713) centre (-3, 40) ccw projected
  arc A4 (2.5454, 31.9845) -> (-0.2302, 33.5713) centre (0.5611, 31.7345) ccw projected
  line L0 (2.5454, 31.9845) -> (3.9428, 20.8933) projected
  arc A5 (0.9674, 18.9062) -> (3.9428, 20.8933) centre (1.9585, 20.6433) ccw projected
  arc A6 (0.9674, 18.9062) -> (-6.9674, 18.9062) centre (-3, 11.9524) ccw projected
  arc A7 (-9.9428, 20.8933) -> (-6.9674, 18.9062) centre (-7.9585, 20.6433) ccw projected
  line L1 (-9.9428, 20.8933) -> (-8.5454, 31.9845) projected
  arc A8 (-5.7698, 33.5713) -> (-8.5454, 31.9845) centre (-6.5611, 31.7345) ccw projected
  arc A9 (-15.5, -2.4495) -> (-12.6429, -9.448) centre (-5.5, -2.4495) ccw projected
  arc A10 (-12.6429, -9.448) -> (6.6429, -9.448) centre (-3, 0) ccw projected
  arc A11 (6.6429, -9.448) -> (9.5, -2.4495) centre (-0.5, -2.4495) ccw projected
  line L2 (9.5, -2.4495) -> (9.5, 0) projected
  arc A12 (9.5, 0) -> (9.402, 1.5625) centre (-3, 0) ccw projected
  line L3 (4.4412, 40.9375) -> (9.402, 1.5625) projected
  arc A13 (4.4412, 40.9375) -> (-10.4412, 40.9375) centre (-3, 40) ccw projected
  line L4 (-15.402, 1.5625) -> (-10.4412, 40.9375) projected
  arc A14 (-15.402, 1.5625) -> (-15.5, 0) centre (-3, 0) ccw projected
  line L5 (-15.5, 0) -> (-15.5, -2.4495) projected
  arc A15 (-7.0507, 14.647) -> (-7.4, 13.5027) centre (-6.4, 13.8229) ccw projected
  arc A16 (1.0507, 14.647) -> (-7.0507, 14.647) centre (-3, 11.7157) ccw projected
  arc A17 (1.4, 13.5027) -> (1.0507, 14.647) centre (0.4, 13.8229) ccw projected
  line L6 (1.4, 13.5027) -> (1.4, -1.787) projected
  arc A18 (1.0507, -2.9312) -> (1.4, -1.787) centre (0.4, -2.1071) ccw projected
  arc A19 (-7.0507, -2.9312) -> (1.0507, -2.9312) centre (-3, 0) ccw projected
  arc A20 (-7.4, -1.787) -> (-7.0507, -2.9312) centre (-6.4, -2.1071) ccw projected
  line L7 (-7.4, -1.787) -> (-7.4, 13.5027) projected
  point P0 (0, 0)
extrude "돌출18" add sketch "스케치18" against normal blind 3 contours A3 A4 L0 A5 A6 A7 L1 A8
sketch "스케치19" plane through (0, 0, 0) normal (0, 0, -1) x (-1, 0, 0)
  circle A0 centre (-6, -10) radius 1.35 projected
  circle A1 centre (0, -10) radius 1.35 projected
  circle A2 centre (-3, 40) radius 4 projected
  arc A3 (-15.5, -2.4495) -> (-12.6429, -9.448) centre (-5.5, -2.4495) ccw projected
  arc A4 (-12.6429, -9.448) -> (6.6429, -9.448) centre (-3, 0) ccw projected
  arc A5 (6.6429, -9.448) -> (9.5, -2.4495) centre (-0.5, -2.4495) ccw projected
  line L0 (9.5, -2.4495) -> (9.5, 0) projected
  arc A6 (9.5, 0) -> (9.402, 1.5625) centre (-3, 0) ccw projected
  line L1 (4.4412, 40.9375) -> (9.402, 1.5625) projected
  arc A7 (4.4412, 40.9375) -> (-10.4412, 40.9375) centre (-3, 40) ccw projected
  line L2 (-15.402, 1.5625) -> (-10.4412, 40.9375) projected
  arc A8 (-15.402, 1.5625) -> (-15.5, 0) centre (-3, 0) ccw projected
  line L3 (-15.5, 0) -> (-15.5, -2.4495) projected
  arc A9 (-7.0507, 14.647) -> (-7.4, 13.5027) centre (-6.4, 13.8229) ccw projected
  arc A10 (1.0507, 14.647) -> (-7.0507, 14.647) centre (-3, 11.7157) ccw projected
  arc A11 (1.4, 13.5027) -> (1.0507, 14.647) centre (0.4, 13.8229) ccw projected
  line L4 (1.4, 13.5027) -> (1.4, -1.787) projected
  arc A12 (1.0507, -2.9312) -> (1.4, -1.787) centre (0.4, -2.1071) ccw projected
  arc A13 (-7.0507, -2.9312) -> (1.0507, -2.9312) centre (-3, 0) ccw projected
  arc A14 (-7.4, -1.787) -> (-7.0507, -2.9312) centre (-6.4, -2.1071) ccw projected
  line L5 (-7.4, -1.787) -> (-7.4, 13.5027) projected
  circle A15 centre (-3, 0) radius 5
  circle A16 centre (-3, 11.7157) radius 5
  line L6 (-3, 0) -> (-3, 20)
  line L7 (-3, 0) -> (17, 0) construction
  line L8 (-7.4, 13.5027) -> (1.4, 13.5027)
  line L9 (1.4, 13.5027) -> (1.4, 36)
  line L10 (1.4, 36) -> (-7.4, 36)
  line L11 (-7.4, 36) -> (-7.4, 13.5027)
  circle A17 centre (-3, 20) radius 5
  point P0 (0, 0)
  point P1 (-7.4, 14.143)
  point P2 (1.4, 14.143)
  point P3 (1.4, 22.3749)
  point P4 (-7.4, 22.3749)
  dimension "d69" = 20
  dimension "d70" = 90
  dimension "d71" = 10
extrude "돌출19" cut sketch "스케치19" against normal blind 3 contours L9 A17 A10 L11 | L9 A11 A10 A17 | A17 A10 A9 L11
sketch "스케치20" plane through (0, 0, 0) normal (0, 0, -1) x (-1, 0, 0)
  line L0 (1.4, 22.3749) -> (1.4, 14.143) projected
  arc A0 (1.4, 13.5027) -> (1.4, 14.143) centre (0.4, 13.8229) ccw projected
  line L1 (1.4, 13.5027) -> (1.4, -1.787) projected
  arc A1 (1.0507, -2.9312) -> (1.4, -1.787) centre (0.4, -2.1071) ccw projected
  arc A2 (-7.0507, -2.9312) -> (1.0507, -2.9312) centre (-3, 0) ccw projected
  arc A3 (-7.4, -1.787) -> (-7.0507, -2.9312) centre (-6.4, -2.1071) ccw projected
  line L2 (-7.4, -1.787) -> (-7.4, 13.5027) projected
  arc A4 (-7.4, 14.143) -> (-7.4, 13.5027) centre (-6.4, 13.8229) ccw projected
  line L3 (-7.4, 14.143) -> (-7.4, 22.3749) projected
  arc A5 (1.4, 22.3749) -> (-7.4, 22.3749) centre (-3, 20) ccw projected
  circle A6 centre (-6, -10) radius 1.35 projected
  circle A7 centre (0, -10) radius 1.35 projected
  circle A8 centre (-3, 40) radius 4 projected
  arc A9 (-15.5, -2.4495) -> (-12.6429, -9.448) centre (-5.5, -2.4495) ccw projected
  arc A10 (-12.6429, -9.448) -> (6.6429, -9.448) centre (-3, 0) ccw projected
  arc A11 (6.6429, -9.448) -> (9.5, -2.4495) centre (-0.5, -2.4495) ccw projected
  line L4 (9.5, -2.4495) -> (9.5, 0) projected
  arc A12 (9.5, 0) -> (9.402, 1.5625) centre (-3, 0) ccw projected
  line L5 (4.4412, 40.9375) -> (9.402, 1.5625) projected
  arc A13 (4.4412, 40.9375) -> (-10.4412, 40.9375) centre (-3, 40) ccw projected
  line L6 (-15.402, 1.5625) -> (-10.4412, 40.9375) projected
  arc A14 (-15.402, 1.5625) -> (-15.5, 0) centre (-3, 0) ccw projected
  line L7 (-15.5, 0) -> (-15.5, -2.4495) projected
  line L8 (-7.4, 22.3749) -> (1.4, 22.3749)
  line L9 (1.4, 22.3749) -> (1.4, -7.9312)
  line L10 (1.4, -7.9312) -> (-7.4, -7.9312)
  line L11 (-7.4, -7.9312) -> (-7.4, 22.3749)
  point P0 (0, 0)
  point P1 (1.4, 13.5027)
  point P2 (-7.4, 14.143)
extrude "돌출20" add sketch "스케치20" against normal blind 3 contours A0 L9 | L11 A4
sketch "스케치21" plane through (0, 0, 0) normal (0, 0, -1) x (-1, 0, 0)
  line L0 (1.4, 22.3749) -> (1.4, -1.787) projected
  arc A0 (1.0507, -2.9312) -> (1.4, -1.787) centre (0.4, -2.1071) ccw projected
  arc A1 (-7.0507, -2.9312) -> (1.0507, -2.9312) centre (-3, 0) ccw projected
  arc A2 (-7.4, -1.787) -> (-7.0507, -2.9312) centre (-6.4, -2.1071) ccw projected
  line L1 (-7.4, -1.787) -> (-7.4, 22.3749) projected
  arc A3 (1.4, 22.3749) -> (-7.4, 22.3749) centre (-3, 20) ccw projected
  circle A4 centre (-6, -10) radius 1.35 projected
  circle A5 centre (0, -10) radius 1.35 projected
  circle A6 centre (-3, 40) radius 4 projected
  arc A7 (-15.5, -2.4495) -> (-12.6429, -9.448) centre (-5.5, -2.4495) ccw projected
  arc A8 (-12.6429, -9.448) -> (6.6429, -9.448) centre (-3, 0) ccw projected
  arc A9 (6.6429, -9.448) -> (9.5, -2.4495) centre (-0.5, -2.4495) ccw projected
  line L2 (9.5, -2.4495) -> (9.5, 0) projected
  arc A10 (9.5, 0) -> (9.402, 1.5625) centre (-3, 0) ccw projected
  line L3 (4.4412, 40.9375) -> (9.402, 1.5625) projected
  arc A11 (4.4412, 40.9375) -> (-10.4412, 40.9375) centre (-3, 40) ccw projected
  line L4 (-15.402, 1.5625) -> (-10.4412, 40.9375) projected
  arc A12 (-15.402, 1.5625) -> (-15.5, 0) centre (-3, 0) ccw projected
  line L5 (-15.5, 0) -> (-15.5, -2.4495) projected
  line L6 (-6.4, -2.1071) -> (-3, 0)
  line L7 (-3, 0) -> (0.4, -2.1071)
  line L8 (0.4, 27.1071) -> (-3, 25)
  line L9 (-3, 25) -> (-6.4, 27.1071)
  circle A13 centre (-6.4, 27.1071) radius 1.05
  circle A14 centre (0.4, 27.1071) radius 1.05
  line L10 (0.4, 22.1071) -> (-3, 20)
  line L11 (-3, 20) -> (-6.4, 22.1071)
  circle A15 centre (-6.4, 22.1071) radius 1.05
  circle A16 centre (0.4, 22.1071) radius 1.05
  point P0 (0, 0)
  point P1 (-3, 25)
  point P2 (-3, 20)
  dimension "d76" = 2.1
  dimension "d77" = 2.1
  dimension "d80" = 2.1
  dimension "d81" = 2.1
extrude "돌출21" cut sketch "스케치21" against normal blind 3 contours A3 A16 L0 | L0 A16 A3 | A15 L1 A3 | A3 L1 A15
sketch "스케치22" plane through (0, 0, 3) normal (0, 0, 1) x (1, 0, 0)
  arc A0 (-1.0507, 22.9312) -> (-1.4, 21.787) centre (-0.4, 22.1071) ccw projected
  arc A1 (7.0507, 22.9312) -> (-1.0507, 22.9312) centre (3, 20) ccw projected
  arc A2 (7.4, 21.787) -> (7.0507, 22.9312) centre (6.4, 22.1071) ccw projected
  line L0 (7.4, 21.787) -> (7.4, -1.787) projected
  arc A3 (7.0507, -2.9312) -> (7.4, -1.787) centre (6.4, -2.1071) ccw projected
  arc A4 (-1.0507, -2.9312) -> (7.0507, -2.9312) centre (3, 0) ccw projected
  arc A5 (-1.4, -1.787) -> (-1.0507, -2.9312) centre (-0.4, -2.1071) ccw projected
  line L1 (-1.4, -1.787) -> (-1.4, 21.787) projected
  circle A6 centre (3, 40) radius 4 projected
  circle A7 centre (0, -10) radius 1.35 projected
  circle A8 centre (6, -10) radius 1.35 projected
  arc A9 (12.6429, -9.448) -> (15.5, -2.4495) centre (5.5, -2.4495) ccw projected
  line L2 (15.5, 0) -> (15.5, -2.4495) projected
  arc A10 (15.5, 0) -> (15.402, 1.5625) centre (3, 0) ccw projected
  line L3 (15.402, 1.5625) -> (10.4412, 40.9375) projected
  arc A11 (10.4412, 40.9375) -> (-4.4412, 40.9375) centre (3, 40) ccw projected
  line L4 (-4.4412, 40.9375) -> (-9.402, 1.5625) projected
  arc A12 (-9.402, 1.5625) -> (-9.5, 0) centre (3, 0) ccw projected
  line L5 (-9.5, -2.4495) -> (-9.5, 0) projected
  arc A13 (-9.5, -2.4495) -> (-6.6429, -9.448) centre (0.5, -2.4495) ccw projected
  arc A14 (-6.6429, -9.448) -> (12.6429, -9.448) centre (3, 0) ccw projected
  circle A15 centre (6, -10) radius 1.35 projected
  circle A16 centre (0, -10) radius 1.35 projected
  line L6 (16.45, -8) -> (-9.45, -8) projected
  line L7 (-9.45, -12) -> (-9.45, -8) projected
  line L8 (16.45, -12) -> (-9.45, -12) projected
  line L9 (16.45, -12) -> (16.45, -8) projected
  line L10 (-9.45, -12) -> (-9.45, 9.2219)
  line L11 (-9.45, -12) -> (11.7719, -12) construction
  line L12 (-9.45, 9.2219) -> (16.45, 9.2219)
  line L13 (16.45, 9.2219) -> (16.45, -12)
  line L14 (16.45, -12) -> (-9.45, -12)
  line L15 (-9.45, -12) -> (-9.45, 9.2219)
  line L16 (15.402, 1.5625) -> (10.4412, 40.9375) projected
  line L17 (15.402, 1.5625) -> (17.4518, -14.7074)
  point P0 (0, 0)
  point P1 (16.45, -6.7561)
  point P2 (9.1847, -12)
  point P3 (-3.1847, -12)
  point P4 (-9.45, -3.4482)
  dimension "d82" = 90
extrude "돌출22" add sketch "스케치22" against normal blind 3 contours L17 L13 L6 A9 L2 A10 | A13 L6 L10 | A13 A14 L8 L7 L6 | L9 L8 A14 A9 L6
sketch "스케치23" plane through (0, 0, 3) normal (0, 0, 1) x (1, 0, 0)
  arc A0 (-1.0507, 22.9312) -> (-1.4, 21.787) centre (-0.4, 22.1071) ccw projected
  arc A1 (7.0507, 22.9312) -> (-1.0507, 22.9312) centre (3, 20) ccw projected
  arc A2 (7.4, 21.787) -> (7.0507, 22.9312) centre (6.4, 22.1071) ccw projected
  line L0 (7.4, 21.787) -> (7.4, -1.787) projected
  arc A3 (7.0507, -2.9312) -> (7.4, -1.787) centre (6.4, -2.1071) ccw projected
  arc A4 (-1.0507, -2.9312) -> (7.0507, -2.9312) centre (3, 0) ccw projected
  arc A5 (-1.4, -1.787) -> (-1.0507, -2.9312) centre (-0.4, -2.1071) ccw projected
  line L1 (-1.4, -1.787) -> (-1.4, 21.787) projected
  circle A6 centre (3, 40) radius 4 projected
  circle A7 centre (0, -10) radius 1.35 projected
  circle A8 centre (6, -10) radius 1.35 projected
  line L2 (9.1847, -12) -> (16.45, -12) projected
  line L3 (16.45, -12) -> (16.45, -6.7561) projected
  line L4 (16.45, -6.7561) -> (10.4412, 40.9375) projected
  arc A9 (10.4412, 40.9375) -> (-4.4412, 40.9375) centre (3, 40) ccw projected
  line L5 (-4.4412, 40.9375) -> (-9.402, 1.5625) projected
  arc A10 (-9.402, 1.5625) -> (-9.5, 0) centre (3, 0) ccw projected
  line L6 (-9.5, -2.4495) -> (-9.5, 0) projected
  arc A11 (-9.5, -2.4495) -> (-9.45, -3.4482) centre (0.5, -2.4495) ccw projected
  line L7 (-9.45, -3.4482) -> (-9.45, -12) projected
  line L8 (-9.45, -12) -> (-3.1847, -12) projected
  arc A12 (-3.1847, -12) -> (9.1847, -12) centre (3, 0) ccw projected
  line L9 (-9.45, -12) -> (16.45, -12)
  line L10 (16.45, -12) -> (16.45, 19.622)
  line L11 (16.45, 19.622) -> (-9.45, 19.622)
  line L12 (-9.45, 19.622) -> (-9.45, -12)
  point P0 (0, 0)
  point P1 (-9.45, -3.4482)
  point P2 (-9.45, 1.1169)
  point P3 (-7.1267, 19.622)
  point P4 (13.1267, 19.622)
extrude "돌출23" cut sketch "스케치23" against normal through all contours L5 A10 L12 L11 | L11 L10 L4 | L12 A11 L6 A10 | A12 L9
sketch "스케치24" plane through (0, 0, 0) normal (0, 0, -1) x (-1, 0, 0)
  line L0 (9.45, -12) -> (-16.45, -12) projected
  line L1 (-16.45, -12) -> (9.45, -12) projected
  arc A0 (1.4, 21.787) -> (1.0507, 22.9312) centre (0.4, 22.1071) ccw projected
  line L2 (1.4, 21.787) -> (1.4, -1.787) projected
  arc A1 (1.0507, -2.9312) -> (1.4, -1.787) centre (0.4, -2.1071) ccw projected
  arc A2 (-7.0507, -2.9312) -> (1.0507, -2.9312) centre (-3, 0) ccw projected
  arc A3 (-7.4, -1.787) -> (-7.0507, -2.9312) centre (-6.4, -2.1071) ccw projected
  line L3 (-7.4, -1.787) -> (-7.4, 21.787) projected
  arc A4 (-7.0507, 22.9312) -> (-7.4, 21.787) centre (-6.4, 22.1071) ccw projected
  arc A5 (1.0507, 22.9312) -> (-7.0507, 22.9312) centre (-3, 20) ccw projected
  circle A6 centre (-6, -10) radius 1.35 projected
  circle A7 centre (0, -10) radius 1.35 projected
  circle A8 centre (-3, 40) radius 4 projected
  line L4 (9.45, -12) -> (9.45, 1.1169) projected
  arc A9 (9.45, 1.1169) -> (9.402, 1.5625) centre (-3, 0) ccw projected
  line L5 (4.4412, 40.9375) -> (9.402, 1.5625) projected
  arc A10 (4.4412, 40.9375) -> (-10.4412, 40.9375) centre (-3, 40) ccw projected
  line L6 (-10.4412, 40.9375) -> (-16.45, -6.7561) projected
  line L7 (-16.45, -6.7561) -> (-16.45, -12) projected
  line L8 (-16.45, -12) -> (9.45, -12) projected
  line L9 (-16.45, -8) -> (9.45, -8) projected
  line L10 (-16.45, -8) -> (-16.45, -12)
  line L11 (-16.45, -12) -> (-12.45, -12)
  line L12 (-12.45, -12) -> (-12.45, -8)
  line L13 (-12.45, -8) -> (-16.45, -8)
  line L14 (9.45, -8) -> (9.45, -12)
  line L15 (9.45, -12) -> (5.45, -12)
  line L16 (5.45, -12) -> (5.45, -8)
  line L17 (5.45, -8) -> (9.45, -8)
  line L18 (5.39, -7.94) -> (5.39, -12.06)
  line L19 (5.39, -12.06) -> (9.51, -12.06)
  line L20 (9.51, -12.06) -> (9.51, -7.94)
  line L21 (9.51, -7.94) -> (5.39, -7.94)
  line L22 (-12.39, -7.94) -> (-12.39, -12.06)
  line L23 (-12.39, -12.06) -> (-16.51, -12.06)
  line L24 (-16.51, -12.06) -> (-16.51, -7.94)
  line L25 (-16.51, -7.94) -> (-12.39, -7.94)
  point P0 (0, 0)
  dimension "d87" = 4
  dimension "d88" = 4
  dimension "d89" = 0.06
  dimension "d90" = 0.06
extrude "돌출24" cut sketch "스케치24" against normal blind 3 contours L4 L21 L20 L19 L18 L0 | L0 L16 L9 L4 | L0 L18 L9 L16 | L9 L18 L21 L4 | L22 L23 L24 L25 L7 L0 | L0 L12 L9 L22 | L0 L7 L9 L12 | L9 L7 L25 L22
sketch "스케치25" plane through (0, 0, 0) normal (0, 0, -1) x (-1, 0, 0)
  line L0 (5.39, -7.94) -> (9.45, -7.94) projected
  line L1 (9.45, -7.94) -> (9.45, 1.1169) projected
  arc A0 (9.45, 1.1169) -> (9.402, 1.5625) centre (-3, 0) ccw projected
  line L2 (4.4412, 40.9375) -> (9.402, 1.5625) projected
  arc A1 (4.4412, 40.9375) -> (-10.4412, 40.9375) centre (-3, 40) ccw projected
  line L3 (-10.4412, 40.9375) -> (-16.45, -6.7561) projected
  line L4 (-16.45, -6.7561) -> (-16.45, -7.94) projected
  line L5 (-16.45, -7.94) -> (-12.39, -7.94) projected
  line L6 (-12.39, -7.94) -> (-12.39, -12) projected
  line L7 (-12.39, -12) -> (5.39, -12) projected
  line L8 (5.39, -12) -> (5.39, -7.94) projected
  arc A2 (1.4, 21.787) -> (1.0507, 22.9312) centre (0.4, 22.1071) ccw projected
  line L9 (1.4, 21.787) -> (1.4, -1.787) projected
  arc A3 (1.0507, -2.9312) -> (1.4, -1.787) centre (0.4, -2.1071) ccw projected
  arc A4 (-7.0507, -2.9312) -> (1.0507, -2.9312) centre (-3, 0) ccw projected
  arc A5 (-7.4, -1.787) -> (-7.0507, -2.9312) centre (-6.4, -2.1071) ccw projected
  line L10 (-7.4, -1.787) -> (-7.4, 21.787) projected
  arc A6 (-7.0507, 22.9312) -> (-7.4, 21.787) centre (-6.4, 22.1071) ccw projected
  arc A7 (1.0507, 22.9312) -> (-7.0507, 22.9312) centre (-3, 20) ccw projected
  circle A8 centre (-6, -10) radius 1.35 projected
  circle A9 centre (0, -10) radius 1.35 projected
  circle A10 centre (-3, 40) radius 4 projected
  circle A11 centre (-12.39, -7.94) radius 1.1
  circle A12 centre (5.39, -7.94) radius 1.1
  point P0 (0, 0)
  dimension "d93" = 2.2
  dimension "d94" = 2.2
extrude "돌출25" cut sketch "스케치25" against normal through all contours L8 A12 L0 | L0 A12 L8 | A11 L5 L6 | L6 L5 A11
sketch "스케치26" plane through (0, 0, 0) normal (0, 0, -1) x (-1, 0, 0)
  circle A0 centre (-3, 40) radius 4 projected
  circle A1 centre (0, -10) radius 1.35 projected
  circle A2 centre (-6, -10) radius 1.35 projected
  arc A3 (1.4, 21.787) -> (1.0507, 22.9312) centre (0.4, 22.1071) ccw projected
  line L0 (1.4, 21.787) -> (1.4, -1.787) projected
  arc A4 (1.0507, -2.9312) -> (1.4, -1.787) centre (0.4, -2.1071) ccw projected
  arc A5 (-7.0507, -2.9312) -> (1.0507, -2.9312) centre (-3, 0) ccw projected
  arc A6 (-7.4, -1.787) -> (-7.0507, -2.9312) centre (-6.4, -2.1071) ccw projected
  line L1 (-7.4, -1.787) -> (-7.4, 21.787) projected
  arc A7 (-7.0507, 22.9312) -> (-7.4, 21.787) centre (-6.4, 22.1071) ccw projected
  arc A8 (1.0507, 22.9312) -> (-7.0507, 22.9312) centre (-3, 20) ccw projected
  arc A9 (6.49, -7.94) -> (5.39, -9.04) centre (5.39, -7.94) ccw projected
  line L2 (6.49, -7.94) -> (9.45, -7.94) projected
  line L3 (9.45, -7.94) -> (9.45, 1.1169) projected
  arc A10 (9.45, 1.1169) -> (9.402, 1.5625) centre (-3, 0) ccw projected
  line L4 (4.4412, 40.9375) -> (9.402, 1.5625) projected
  arc A11 (4.4412, 40.9375) -> (-10.4412, 40.9375) centre (-3, 40) ccw projected
  line L5 (-10.4412, 40.9375) -> (-16.45, -6.7561) projected
  line L6 (-16.45, -6.7561) -> (-16.45, -7.94) projected
  line L7 (-16.45, -7.94) -> (-13.49, -7.94) projected
  arc A12 (-12.39, -9.04) -> (-13.49, -7.94) centre (-12.39, -7.94) ccw projected
  line L8 (-12.39, -9.04) -> (-12.39, -12) projected
  line L9 (-12.39, -12) -> (5.39, -12) projected
  line L10 (5.39, -12) -> (5.39, -9.04) projected
  line L11 (-16.45, -16.06) -> (9.45, -16.06)
  line L12 (9.45, -16.06) -> (9.45, -7.94)
  line L13 (9.45, -7.94) -> (-16.45, -7.94)
  line L14 (-16.45, -7.94) -> (-16.45, -16.06)
  line L15 (5.39, -12) -> (-12.39, -12) projected
  line L16 (-16.45, -16.06) -> (9.45, -7.94) construction
  line L17 (9.45, -16.06) -> (-16.45, -7.94) construction
  line L18 (-16.45, -7.94) -> (9.45, -7.94)
  line L19 (9.45, -7.94) -> (9.45, -3.94)
  line L20 (9.45, -3.94) -> (-16.45, -3.94)
  line L21 (-16.45, -3.94) -> (-16.45, -7.94)
  line L22 (-16.45, -3.94) -> (-9.8973, 45.001)
  point P0 (0, 0)
  point P1 (-3.5, -12)
  point P2 (-16.45, -6.7561)
  point P3 (-10.4337, 40.9953)
  dimension "d97" = 4
extrude "돌출26" add sketch "스케치26" against normal up to surface (3 mm away) contours L20 L22 L5 | L5 L21 L20
sketch "스케치27" plane through (0, 0, 3) normal (0, 0, 1) x (1, 0, 0)
  arc A0 (-5.39, -9.04) -> (-6.49, -7.94) centre (-5.39, -7.94) ccw projected
  line L0 (-5.39, -9.04) -> (-5.39, -12) projected
  line L1 (-5.39, -12) -> (12.39, -12) projected
  line L2 (12.39, -12) -> (12.39, -9.04) projected
  arc A1 (13.49, -7.94) -> (12.39, -9.04) centre (12.39, -7.94) ccw projected
  line L3 (13.49, -7.94) -> (16.45, -7.94) projected
  line L4 (16.45, -7.94) -> (16.45, -3.94) projected
  line L5 (10.4337, 40.9953) -> (16.45, -3.94) projected
  arc A2 (10.4337, 40.9953) -> (-4.4412, 40.9375) centre (3, 40) ccw projected
  line L6 (-4.4412, 40.9375) -> (-9.402, 1.5625) projected
  arc A3 (-9.402, 1.5625) -> (-9.45, 1.1169) centre (3, 0) ccw projected
  line L7 (-9.45, 1.1169) -> (-9.45, -7.94) projected
  line L8 (-9.45, -7.94) -> (-6.49, -7.94) projected
  circle A4 centre (6, -10) radius 1.35 projected
  circle A5 centre (0, -10) radius 1.35 projected
  circle A6 centre (3, 40) radius 4 projected
  arc A7 (-1.0507, 22.9312) -> (-1.4, 21.787) centre (-0.4, 22.1071) ccw projected
  arc A8 (7.0507, 22.9312) -> (-1.0507, 22.9312) centre (3, 20) ccw projected
  arc A9 (7.4, 21.787) -> (7.0507, 22.9312) centre (6.4, 22.1071) ccw projected
  line L9 (7.4, 21.787) -> (7.4, -1.787) projected
  arc A10 (7.0507, -2.9312) -> (7.4, -1.787) centre (6.4, -2.1071) ccw projected
  arc A11 (-1.0507, -2.9312) -> (7.0507, -2.9312) centre (3, 0) ccw projected
  arc A12 (-1.4, -1.787) -> (-1.0507, -2.9312) centre (-0.4, -2.1071) ccw projected
  line L10 (-1.4, -1.787) -> (-1.4, 21.787) projected
  line L11 (16.45, -7.94) -> (16.45, -3.94)
  line L12 (16.45, -3.94) -> (-9.45, -3.94)
  line L13 (-9.45, -3.94) -> (-9.45, -7.94)
  line L14 (-9.45, -7.94) -> (16.45, -7.94)
  line L15 (-9.45, -3.94) -> (-3.7438, 47.1935)
  arc A13 (10.4337, 40.9953) -> (-4.4412, 40.9375) centre (3, 40) ccw projected
  point P0 (0, 0)
  point P1 (-9.45, -3.94)
  point P2 (-4.4478, 40.8847)
extrude "돌출27" cut sketch "스케치27" against normal through all contours L7 A3 L6 L15
properties part number "Leg_joint_slider_frame" material "알루미늄 6061"
